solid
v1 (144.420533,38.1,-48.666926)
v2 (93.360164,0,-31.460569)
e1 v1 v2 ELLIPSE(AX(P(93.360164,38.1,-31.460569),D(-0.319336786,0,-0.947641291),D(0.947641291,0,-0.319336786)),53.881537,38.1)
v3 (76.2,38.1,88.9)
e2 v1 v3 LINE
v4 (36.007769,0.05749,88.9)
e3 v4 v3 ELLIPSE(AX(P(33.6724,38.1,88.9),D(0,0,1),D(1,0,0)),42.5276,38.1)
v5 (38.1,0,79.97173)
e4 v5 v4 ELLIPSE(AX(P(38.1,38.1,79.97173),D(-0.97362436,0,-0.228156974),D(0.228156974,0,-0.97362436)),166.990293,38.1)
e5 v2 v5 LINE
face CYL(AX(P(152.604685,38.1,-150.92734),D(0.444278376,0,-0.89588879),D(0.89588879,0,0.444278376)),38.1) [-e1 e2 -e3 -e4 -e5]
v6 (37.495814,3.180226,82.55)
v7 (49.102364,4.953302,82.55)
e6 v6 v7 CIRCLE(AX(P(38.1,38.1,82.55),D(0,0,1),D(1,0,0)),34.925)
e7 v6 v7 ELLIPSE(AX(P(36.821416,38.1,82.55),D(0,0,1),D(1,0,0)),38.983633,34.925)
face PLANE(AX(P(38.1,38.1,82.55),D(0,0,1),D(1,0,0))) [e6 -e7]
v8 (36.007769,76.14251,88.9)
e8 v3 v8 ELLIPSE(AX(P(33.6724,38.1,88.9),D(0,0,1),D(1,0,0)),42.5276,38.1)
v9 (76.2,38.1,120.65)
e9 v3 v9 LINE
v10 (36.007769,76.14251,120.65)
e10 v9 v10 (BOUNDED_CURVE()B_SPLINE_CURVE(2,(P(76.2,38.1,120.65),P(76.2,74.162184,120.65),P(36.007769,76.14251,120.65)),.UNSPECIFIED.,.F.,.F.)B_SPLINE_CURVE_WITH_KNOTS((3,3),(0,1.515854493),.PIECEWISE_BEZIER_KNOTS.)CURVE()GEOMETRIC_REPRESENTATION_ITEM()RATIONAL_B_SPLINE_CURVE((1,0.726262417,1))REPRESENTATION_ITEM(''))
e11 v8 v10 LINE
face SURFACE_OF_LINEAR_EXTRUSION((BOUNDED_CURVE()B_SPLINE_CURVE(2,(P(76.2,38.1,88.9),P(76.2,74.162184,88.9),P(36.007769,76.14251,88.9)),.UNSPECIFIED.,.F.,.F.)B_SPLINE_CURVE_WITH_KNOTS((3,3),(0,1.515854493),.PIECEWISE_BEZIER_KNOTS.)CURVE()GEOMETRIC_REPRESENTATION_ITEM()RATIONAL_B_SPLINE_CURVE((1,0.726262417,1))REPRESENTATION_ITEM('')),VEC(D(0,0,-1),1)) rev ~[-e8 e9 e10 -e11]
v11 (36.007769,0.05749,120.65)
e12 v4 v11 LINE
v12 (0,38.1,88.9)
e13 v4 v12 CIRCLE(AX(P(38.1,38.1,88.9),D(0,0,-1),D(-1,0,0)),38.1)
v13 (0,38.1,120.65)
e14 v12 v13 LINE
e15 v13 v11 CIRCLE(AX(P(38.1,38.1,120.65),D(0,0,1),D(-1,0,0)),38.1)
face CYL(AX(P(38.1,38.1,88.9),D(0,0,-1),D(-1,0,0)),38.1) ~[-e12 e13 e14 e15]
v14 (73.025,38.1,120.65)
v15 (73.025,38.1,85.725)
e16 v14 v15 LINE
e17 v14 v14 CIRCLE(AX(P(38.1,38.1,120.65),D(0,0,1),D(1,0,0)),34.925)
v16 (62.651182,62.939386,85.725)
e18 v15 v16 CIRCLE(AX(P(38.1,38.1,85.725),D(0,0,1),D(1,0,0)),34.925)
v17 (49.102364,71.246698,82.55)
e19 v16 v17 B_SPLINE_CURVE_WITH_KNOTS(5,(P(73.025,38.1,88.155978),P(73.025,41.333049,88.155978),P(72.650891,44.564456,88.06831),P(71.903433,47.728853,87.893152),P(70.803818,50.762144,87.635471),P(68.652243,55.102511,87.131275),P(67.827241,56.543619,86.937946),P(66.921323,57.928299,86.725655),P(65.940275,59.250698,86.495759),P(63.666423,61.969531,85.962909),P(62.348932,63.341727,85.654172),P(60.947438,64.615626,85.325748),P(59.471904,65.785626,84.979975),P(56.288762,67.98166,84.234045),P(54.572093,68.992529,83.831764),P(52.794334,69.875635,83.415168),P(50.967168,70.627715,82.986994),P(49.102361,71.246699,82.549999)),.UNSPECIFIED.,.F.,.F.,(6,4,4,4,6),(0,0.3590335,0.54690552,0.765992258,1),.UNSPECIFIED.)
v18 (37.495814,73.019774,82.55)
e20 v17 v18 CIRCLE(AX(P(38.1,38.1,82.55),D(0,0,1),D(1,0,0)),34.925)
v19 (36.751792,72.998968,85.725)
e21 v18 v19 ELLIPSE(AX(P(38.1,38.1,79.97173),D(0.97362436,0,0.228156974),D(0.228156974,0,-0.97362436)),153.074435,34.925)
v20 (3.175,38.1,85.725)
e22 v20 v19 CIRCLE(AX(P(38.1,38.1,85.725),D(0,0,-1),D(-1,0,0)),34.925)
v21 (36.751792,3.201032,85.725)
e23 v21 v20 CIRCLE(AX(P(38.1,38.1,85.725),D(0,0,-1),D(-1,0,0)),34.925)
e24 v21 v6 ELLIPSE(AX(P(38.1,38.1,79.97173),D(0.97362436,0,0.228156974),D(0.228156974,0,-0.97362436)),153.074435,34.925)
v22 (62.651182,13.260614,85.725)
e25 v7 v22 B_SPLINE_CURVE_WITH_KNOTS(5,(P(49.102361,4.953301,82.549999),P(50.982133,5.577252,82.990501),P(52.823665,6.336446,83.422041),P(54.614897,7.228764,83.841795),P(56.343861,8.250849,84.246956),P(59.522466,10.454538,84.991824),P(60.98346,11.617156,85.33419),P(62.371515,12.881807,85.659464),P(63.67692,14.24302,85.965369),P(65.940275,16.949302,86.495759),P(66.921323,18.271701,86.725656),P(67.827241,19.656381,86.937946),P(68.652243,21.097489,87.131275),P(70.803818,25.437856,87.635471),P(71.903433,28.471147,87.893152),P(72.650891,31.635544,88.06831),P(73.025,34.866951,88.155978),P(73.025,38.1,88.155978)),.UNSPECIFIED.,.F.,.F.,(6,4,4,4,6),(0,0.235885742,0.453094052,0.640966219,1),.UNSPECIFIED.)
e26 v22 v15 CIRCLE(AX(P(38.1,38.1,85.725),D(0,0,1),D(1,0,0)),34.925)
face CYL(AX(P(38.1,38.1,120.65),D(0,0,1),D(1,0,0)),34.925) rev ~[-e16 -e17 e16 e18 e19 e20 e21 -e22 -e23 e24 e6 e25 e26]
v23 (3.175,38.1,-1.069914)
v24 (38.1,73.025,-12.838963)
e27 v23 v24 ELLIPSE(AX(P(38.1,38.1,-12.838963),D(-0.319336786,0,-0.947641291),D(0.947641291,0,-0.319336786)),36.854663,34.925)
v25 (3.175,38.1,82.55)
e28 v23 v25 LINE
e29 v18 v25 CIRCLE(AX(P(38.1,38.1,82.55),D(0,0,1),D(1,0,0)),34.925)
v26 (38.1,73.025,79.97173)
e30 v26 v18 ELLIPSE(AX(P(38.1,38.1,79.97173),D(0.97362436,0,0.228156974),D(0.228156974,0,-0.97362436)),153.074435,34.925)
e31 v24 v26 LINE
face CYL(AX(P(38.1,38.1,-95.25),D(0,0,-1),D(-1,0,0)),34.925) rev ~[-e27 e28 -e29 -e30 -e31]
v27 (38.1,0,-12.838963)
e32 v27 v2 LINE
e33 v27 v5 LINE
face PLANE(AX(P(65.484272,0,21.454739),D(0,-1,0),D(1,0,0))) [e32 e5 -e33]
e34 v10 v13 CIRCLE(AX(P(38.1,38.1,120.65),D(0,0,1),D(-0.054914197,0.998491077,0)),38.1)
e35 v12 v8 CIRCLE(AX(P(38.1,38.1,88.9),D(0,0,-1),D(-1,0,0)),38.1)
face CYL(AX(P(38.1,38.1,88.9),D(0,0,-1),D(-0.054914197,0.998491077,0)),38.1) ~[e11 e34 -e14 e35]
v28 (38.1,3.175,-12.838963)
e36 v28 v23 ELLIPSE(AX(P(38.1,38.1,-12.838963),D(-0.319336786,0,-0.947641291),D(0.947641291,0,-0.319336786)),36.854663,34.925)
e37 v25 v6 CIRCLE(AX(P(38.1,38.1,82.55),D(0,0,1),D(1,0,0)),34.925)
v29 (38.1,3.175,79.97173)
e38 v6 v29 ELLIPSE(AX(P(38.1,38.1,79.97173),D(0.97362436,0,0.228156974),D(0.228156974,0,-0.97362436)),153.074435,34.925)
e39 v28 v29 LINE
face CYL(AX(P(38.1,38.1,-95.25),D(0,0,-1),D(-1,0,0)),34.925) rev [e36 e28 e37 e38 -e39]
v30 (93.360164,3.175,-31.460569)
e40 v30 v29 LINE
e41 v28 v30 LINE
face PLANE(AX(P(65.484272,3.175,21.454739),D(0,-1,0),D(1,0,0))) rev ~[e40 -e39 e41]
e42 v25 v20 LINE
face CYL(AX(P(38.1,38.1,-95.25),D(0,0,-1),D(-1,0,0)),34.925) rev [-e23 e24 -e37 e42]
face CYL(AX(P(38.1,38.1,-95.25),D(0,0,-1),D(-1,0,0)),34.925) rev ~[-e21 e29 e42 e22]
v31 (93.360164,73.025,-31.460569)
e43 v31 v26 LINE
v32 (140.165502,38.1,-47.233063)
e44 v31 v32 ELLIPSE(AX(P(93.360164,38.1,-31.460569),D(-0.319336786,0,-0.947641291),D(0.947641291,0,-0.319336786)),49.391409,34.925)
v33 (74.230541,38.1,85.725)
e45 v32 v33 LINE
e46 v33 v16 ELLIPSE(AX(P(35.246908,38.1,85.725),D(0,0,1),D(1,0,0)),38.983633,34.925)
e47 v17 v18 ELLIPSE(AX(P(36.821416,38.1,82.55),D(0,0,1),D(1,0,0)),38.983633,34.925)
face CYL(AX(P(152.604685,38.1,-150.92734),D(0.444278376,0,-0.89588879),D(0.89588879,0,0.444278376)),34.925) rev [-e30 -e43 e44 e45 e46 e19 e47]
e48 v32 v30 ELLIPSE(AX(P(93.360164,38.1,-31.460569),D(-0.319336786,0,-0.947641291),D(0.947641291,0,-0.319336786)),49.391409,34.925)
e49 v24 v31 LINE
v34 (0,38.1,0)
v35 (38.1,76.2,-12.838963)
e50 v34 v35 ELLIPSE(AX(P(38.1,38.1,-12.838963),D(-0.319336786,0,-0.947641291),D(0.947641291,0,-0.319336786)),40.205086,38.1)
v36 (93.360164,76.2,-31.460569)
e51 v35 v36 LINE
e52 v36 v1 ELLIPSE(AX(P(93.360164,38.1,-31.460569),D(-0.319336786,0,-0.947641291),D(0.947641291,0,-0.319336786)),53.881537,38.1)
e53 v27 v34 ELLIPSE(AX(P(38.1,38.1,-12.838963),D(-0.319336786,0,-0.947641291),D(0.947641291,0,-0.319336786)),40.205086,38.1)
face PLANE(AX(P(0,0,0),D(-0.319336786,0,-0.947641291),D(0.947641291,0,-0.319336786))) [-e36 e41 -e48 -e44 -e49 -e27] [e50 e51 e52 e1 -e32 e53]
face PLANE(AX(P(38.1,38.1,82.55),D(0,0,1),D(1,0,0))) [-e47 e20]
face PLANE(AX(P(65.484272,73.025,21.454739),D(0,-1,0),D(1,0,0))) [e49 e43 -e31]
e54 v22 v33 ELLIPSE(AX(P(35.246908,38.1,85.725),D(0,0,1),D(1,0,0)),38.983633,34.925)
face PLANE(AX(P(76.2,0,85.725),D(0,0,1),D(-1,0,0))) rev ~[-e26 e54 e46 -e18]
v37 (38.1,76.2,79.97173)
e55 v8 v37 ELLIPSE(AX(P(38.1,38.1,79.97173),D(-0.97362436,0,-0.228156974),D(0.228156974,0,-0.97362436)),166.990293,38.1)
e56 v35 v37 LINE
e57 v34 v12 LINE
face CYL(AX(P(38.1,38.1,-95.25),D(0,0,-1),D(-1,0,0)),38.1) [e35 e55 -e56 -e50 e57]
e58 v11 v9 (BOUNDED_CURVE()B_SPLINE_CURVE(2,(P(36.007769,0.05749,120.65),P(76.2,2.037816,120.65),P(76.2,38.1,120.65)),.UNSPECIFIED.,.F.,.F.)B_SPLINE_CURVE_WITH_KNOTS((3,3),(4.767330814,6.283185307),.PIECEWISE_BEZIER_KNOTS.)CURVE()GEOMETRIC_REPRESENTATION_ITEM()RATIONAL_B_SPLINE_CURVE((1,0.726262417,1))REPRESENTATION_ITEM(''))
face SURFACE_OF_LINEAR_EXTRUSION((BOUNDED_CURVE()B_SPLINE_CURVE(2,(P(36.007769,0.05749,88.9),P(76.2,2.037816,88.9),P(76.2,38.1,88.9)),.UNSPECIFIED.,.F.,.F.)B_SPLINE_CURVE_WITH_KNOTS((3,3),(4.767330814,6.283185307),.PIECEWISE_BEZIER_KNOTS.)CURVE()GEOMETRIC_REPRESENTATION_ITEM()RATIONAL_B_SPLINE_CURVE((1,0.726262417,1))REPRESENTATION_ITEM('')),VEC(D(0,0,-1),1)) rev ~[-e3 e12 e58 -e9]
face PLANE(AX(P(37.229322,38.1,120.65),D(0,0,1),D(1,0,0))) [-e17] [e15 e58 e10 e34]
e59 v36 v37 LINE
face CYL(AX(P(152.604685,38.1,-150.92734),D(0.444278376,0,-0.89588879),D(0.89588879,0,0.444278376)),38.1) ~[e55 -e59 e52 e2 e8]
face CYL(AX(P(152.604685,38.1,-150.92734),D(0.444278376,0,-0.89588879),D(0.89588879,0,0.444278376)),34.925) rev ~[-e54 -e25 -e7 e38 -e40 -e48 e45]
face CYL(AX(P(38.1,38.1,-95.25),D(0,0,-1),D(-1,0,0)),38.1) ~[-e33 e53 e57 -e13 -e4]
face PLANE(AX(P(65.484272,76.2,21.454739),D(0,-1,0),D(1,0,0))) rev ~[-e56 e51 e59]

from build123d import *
from build123d import SkipClean  # not in build123d's __all__

# Parameters (mm, degrees)
F1_DEPTH    = 76.2
F2_T1_DEPTH = 279.4
F2_T3_DEPTH = 344.0535746512
F3_T        = -3.175
F5_DEPTH    = 31.75
F6_R        = 34.925
F7_DEPTH    = 38.1


# Not quite as in the source:
# - a fillet or chamfer that OpenCascade refuses, or shapes differently, is made with other operations: its cross-section is extruded or revolved along the edge and cut away or added


with BuildPart() as f1:
    # F0 (on Front) → F1 (new body)
    with BuildSketch(Plane.XZ):
        Polygon((144.4205327875, -48.6669262372), (76.2, 88.9), (0, 88.9), (0, 0), align=None)
    extrude(amount=-F1_DEPTH)

    # F2: fillet of radius 38.1 on 4 edges, made by hand

    # F2_s2 → F2_t1 (cut)
    with BuildSketch(Plane.XY.offset(-95.25)):
        with BuildLine():
            ThreePointArc((0, 38.1), (11.1592316368, 11.1592316368), (38.1, 0))
            Line((38.1, 0), (0, 0))
            Line((0, 0), (0, 38.1))
        make_face()
        with BuildLine():
            ThreePointArc((0, 38.1), (11.1592316368, 65.0407683632), (38.1, 76.2))
            Line((38.1, 76.2), (0, 76.2))
            Line((0, 76.2), (0, 38.1))
        make_face()
    extrude(amount=F2_T1_DEPTH, mode=Mode.SUBTRACT)

    # F2_s4 → F2_t3 (cut)
    with BuildSketch(Plane(origin=(90.1943185968, 0, -181.8771367864), x_dir=(0, 1, 0), z_dir=(-0.4442783761, 0, 0.8958887903))):
        with BuildLine():
            ThreePointArc((38.1, -107.7630734528), (65.0407683632, -96.603841816), (76.2, -69.6630734528))
            Line((76.2, -69.6630734528), (76.2, -107.7630734528))
            Line((76.2, -107.7630734528), (38.1, -107.7630734528))
        make_face()
        with BuildLine():
            ThreePointArc((38.1, -107.7630734528), (11.1592316368, -96.603841816), (0, -69.6630734528))
            Line((0, -69.6630734528), (0, -107.7630734528))
            Line((0, -107.7630734528), (38.1, -107.7630734528))
        make_face()
    extrude(amount=F2_T3_DEPTH, mode=Mode.SUBTRACT)

    # F3
    f3_openings = [f1.faces().sort_by_distance(p)[0] for p in [
        (71.049342, 38.1, -23.942254),
    ]]
    offset(amount=F3_T, openings=f3_openings)

    # F4 (on face) → F5 (join)
    with BuildSketch(Plane.XY.offset(88.9)):
        with BuildLine():
            add(Edge.make_bspline(
                [(36.0077691103, 0.0574899631), (76.1999999999, 2.0378158336), (76.2, 38.1)],
                knots=[4.7673308141, 4.7673308141, 4.7673308141, 6.2831853072, 6.2831853072, 6.2831853072], degree=2, weights=[1, 0.726262417, 1]))
            add(Edge.make_bspline(
                [(76.2, 38.1), (76.1999999999, 74.1621841664), (36.0077691103, 76.1425100369)],
                knots=[0, 0, 0, 1.5158544931, 1.5158544931, 1.5158544931], degree=2, weights=[1, 0.726262417, 1]))
            ThreePointArc((36.0077691103, 76.1425100369), (10.4294019138, 64.2906090336), (0, 38.1))
            ThreePointArc((0, 38.1), (10.4294019138, 11.9093909664), (36.0077691103, 0.0574899631))
        make_face()
    extrude(amount=F5_DEPTH)

    # F6 (on face) → F7 (cut)
    with BuildSketch(Plane.XY.offset(120.65)):
        with Locations((38.1, 38.1)):
            Circle(F6_R)
    with SkipClean():  # cleaning this boolean's faces spoils the solid; the shape is the same uncleaned
        extrude(amount=-F7_DEPTH, mode=Mode.SUBTRACT)


solid = f1.part
